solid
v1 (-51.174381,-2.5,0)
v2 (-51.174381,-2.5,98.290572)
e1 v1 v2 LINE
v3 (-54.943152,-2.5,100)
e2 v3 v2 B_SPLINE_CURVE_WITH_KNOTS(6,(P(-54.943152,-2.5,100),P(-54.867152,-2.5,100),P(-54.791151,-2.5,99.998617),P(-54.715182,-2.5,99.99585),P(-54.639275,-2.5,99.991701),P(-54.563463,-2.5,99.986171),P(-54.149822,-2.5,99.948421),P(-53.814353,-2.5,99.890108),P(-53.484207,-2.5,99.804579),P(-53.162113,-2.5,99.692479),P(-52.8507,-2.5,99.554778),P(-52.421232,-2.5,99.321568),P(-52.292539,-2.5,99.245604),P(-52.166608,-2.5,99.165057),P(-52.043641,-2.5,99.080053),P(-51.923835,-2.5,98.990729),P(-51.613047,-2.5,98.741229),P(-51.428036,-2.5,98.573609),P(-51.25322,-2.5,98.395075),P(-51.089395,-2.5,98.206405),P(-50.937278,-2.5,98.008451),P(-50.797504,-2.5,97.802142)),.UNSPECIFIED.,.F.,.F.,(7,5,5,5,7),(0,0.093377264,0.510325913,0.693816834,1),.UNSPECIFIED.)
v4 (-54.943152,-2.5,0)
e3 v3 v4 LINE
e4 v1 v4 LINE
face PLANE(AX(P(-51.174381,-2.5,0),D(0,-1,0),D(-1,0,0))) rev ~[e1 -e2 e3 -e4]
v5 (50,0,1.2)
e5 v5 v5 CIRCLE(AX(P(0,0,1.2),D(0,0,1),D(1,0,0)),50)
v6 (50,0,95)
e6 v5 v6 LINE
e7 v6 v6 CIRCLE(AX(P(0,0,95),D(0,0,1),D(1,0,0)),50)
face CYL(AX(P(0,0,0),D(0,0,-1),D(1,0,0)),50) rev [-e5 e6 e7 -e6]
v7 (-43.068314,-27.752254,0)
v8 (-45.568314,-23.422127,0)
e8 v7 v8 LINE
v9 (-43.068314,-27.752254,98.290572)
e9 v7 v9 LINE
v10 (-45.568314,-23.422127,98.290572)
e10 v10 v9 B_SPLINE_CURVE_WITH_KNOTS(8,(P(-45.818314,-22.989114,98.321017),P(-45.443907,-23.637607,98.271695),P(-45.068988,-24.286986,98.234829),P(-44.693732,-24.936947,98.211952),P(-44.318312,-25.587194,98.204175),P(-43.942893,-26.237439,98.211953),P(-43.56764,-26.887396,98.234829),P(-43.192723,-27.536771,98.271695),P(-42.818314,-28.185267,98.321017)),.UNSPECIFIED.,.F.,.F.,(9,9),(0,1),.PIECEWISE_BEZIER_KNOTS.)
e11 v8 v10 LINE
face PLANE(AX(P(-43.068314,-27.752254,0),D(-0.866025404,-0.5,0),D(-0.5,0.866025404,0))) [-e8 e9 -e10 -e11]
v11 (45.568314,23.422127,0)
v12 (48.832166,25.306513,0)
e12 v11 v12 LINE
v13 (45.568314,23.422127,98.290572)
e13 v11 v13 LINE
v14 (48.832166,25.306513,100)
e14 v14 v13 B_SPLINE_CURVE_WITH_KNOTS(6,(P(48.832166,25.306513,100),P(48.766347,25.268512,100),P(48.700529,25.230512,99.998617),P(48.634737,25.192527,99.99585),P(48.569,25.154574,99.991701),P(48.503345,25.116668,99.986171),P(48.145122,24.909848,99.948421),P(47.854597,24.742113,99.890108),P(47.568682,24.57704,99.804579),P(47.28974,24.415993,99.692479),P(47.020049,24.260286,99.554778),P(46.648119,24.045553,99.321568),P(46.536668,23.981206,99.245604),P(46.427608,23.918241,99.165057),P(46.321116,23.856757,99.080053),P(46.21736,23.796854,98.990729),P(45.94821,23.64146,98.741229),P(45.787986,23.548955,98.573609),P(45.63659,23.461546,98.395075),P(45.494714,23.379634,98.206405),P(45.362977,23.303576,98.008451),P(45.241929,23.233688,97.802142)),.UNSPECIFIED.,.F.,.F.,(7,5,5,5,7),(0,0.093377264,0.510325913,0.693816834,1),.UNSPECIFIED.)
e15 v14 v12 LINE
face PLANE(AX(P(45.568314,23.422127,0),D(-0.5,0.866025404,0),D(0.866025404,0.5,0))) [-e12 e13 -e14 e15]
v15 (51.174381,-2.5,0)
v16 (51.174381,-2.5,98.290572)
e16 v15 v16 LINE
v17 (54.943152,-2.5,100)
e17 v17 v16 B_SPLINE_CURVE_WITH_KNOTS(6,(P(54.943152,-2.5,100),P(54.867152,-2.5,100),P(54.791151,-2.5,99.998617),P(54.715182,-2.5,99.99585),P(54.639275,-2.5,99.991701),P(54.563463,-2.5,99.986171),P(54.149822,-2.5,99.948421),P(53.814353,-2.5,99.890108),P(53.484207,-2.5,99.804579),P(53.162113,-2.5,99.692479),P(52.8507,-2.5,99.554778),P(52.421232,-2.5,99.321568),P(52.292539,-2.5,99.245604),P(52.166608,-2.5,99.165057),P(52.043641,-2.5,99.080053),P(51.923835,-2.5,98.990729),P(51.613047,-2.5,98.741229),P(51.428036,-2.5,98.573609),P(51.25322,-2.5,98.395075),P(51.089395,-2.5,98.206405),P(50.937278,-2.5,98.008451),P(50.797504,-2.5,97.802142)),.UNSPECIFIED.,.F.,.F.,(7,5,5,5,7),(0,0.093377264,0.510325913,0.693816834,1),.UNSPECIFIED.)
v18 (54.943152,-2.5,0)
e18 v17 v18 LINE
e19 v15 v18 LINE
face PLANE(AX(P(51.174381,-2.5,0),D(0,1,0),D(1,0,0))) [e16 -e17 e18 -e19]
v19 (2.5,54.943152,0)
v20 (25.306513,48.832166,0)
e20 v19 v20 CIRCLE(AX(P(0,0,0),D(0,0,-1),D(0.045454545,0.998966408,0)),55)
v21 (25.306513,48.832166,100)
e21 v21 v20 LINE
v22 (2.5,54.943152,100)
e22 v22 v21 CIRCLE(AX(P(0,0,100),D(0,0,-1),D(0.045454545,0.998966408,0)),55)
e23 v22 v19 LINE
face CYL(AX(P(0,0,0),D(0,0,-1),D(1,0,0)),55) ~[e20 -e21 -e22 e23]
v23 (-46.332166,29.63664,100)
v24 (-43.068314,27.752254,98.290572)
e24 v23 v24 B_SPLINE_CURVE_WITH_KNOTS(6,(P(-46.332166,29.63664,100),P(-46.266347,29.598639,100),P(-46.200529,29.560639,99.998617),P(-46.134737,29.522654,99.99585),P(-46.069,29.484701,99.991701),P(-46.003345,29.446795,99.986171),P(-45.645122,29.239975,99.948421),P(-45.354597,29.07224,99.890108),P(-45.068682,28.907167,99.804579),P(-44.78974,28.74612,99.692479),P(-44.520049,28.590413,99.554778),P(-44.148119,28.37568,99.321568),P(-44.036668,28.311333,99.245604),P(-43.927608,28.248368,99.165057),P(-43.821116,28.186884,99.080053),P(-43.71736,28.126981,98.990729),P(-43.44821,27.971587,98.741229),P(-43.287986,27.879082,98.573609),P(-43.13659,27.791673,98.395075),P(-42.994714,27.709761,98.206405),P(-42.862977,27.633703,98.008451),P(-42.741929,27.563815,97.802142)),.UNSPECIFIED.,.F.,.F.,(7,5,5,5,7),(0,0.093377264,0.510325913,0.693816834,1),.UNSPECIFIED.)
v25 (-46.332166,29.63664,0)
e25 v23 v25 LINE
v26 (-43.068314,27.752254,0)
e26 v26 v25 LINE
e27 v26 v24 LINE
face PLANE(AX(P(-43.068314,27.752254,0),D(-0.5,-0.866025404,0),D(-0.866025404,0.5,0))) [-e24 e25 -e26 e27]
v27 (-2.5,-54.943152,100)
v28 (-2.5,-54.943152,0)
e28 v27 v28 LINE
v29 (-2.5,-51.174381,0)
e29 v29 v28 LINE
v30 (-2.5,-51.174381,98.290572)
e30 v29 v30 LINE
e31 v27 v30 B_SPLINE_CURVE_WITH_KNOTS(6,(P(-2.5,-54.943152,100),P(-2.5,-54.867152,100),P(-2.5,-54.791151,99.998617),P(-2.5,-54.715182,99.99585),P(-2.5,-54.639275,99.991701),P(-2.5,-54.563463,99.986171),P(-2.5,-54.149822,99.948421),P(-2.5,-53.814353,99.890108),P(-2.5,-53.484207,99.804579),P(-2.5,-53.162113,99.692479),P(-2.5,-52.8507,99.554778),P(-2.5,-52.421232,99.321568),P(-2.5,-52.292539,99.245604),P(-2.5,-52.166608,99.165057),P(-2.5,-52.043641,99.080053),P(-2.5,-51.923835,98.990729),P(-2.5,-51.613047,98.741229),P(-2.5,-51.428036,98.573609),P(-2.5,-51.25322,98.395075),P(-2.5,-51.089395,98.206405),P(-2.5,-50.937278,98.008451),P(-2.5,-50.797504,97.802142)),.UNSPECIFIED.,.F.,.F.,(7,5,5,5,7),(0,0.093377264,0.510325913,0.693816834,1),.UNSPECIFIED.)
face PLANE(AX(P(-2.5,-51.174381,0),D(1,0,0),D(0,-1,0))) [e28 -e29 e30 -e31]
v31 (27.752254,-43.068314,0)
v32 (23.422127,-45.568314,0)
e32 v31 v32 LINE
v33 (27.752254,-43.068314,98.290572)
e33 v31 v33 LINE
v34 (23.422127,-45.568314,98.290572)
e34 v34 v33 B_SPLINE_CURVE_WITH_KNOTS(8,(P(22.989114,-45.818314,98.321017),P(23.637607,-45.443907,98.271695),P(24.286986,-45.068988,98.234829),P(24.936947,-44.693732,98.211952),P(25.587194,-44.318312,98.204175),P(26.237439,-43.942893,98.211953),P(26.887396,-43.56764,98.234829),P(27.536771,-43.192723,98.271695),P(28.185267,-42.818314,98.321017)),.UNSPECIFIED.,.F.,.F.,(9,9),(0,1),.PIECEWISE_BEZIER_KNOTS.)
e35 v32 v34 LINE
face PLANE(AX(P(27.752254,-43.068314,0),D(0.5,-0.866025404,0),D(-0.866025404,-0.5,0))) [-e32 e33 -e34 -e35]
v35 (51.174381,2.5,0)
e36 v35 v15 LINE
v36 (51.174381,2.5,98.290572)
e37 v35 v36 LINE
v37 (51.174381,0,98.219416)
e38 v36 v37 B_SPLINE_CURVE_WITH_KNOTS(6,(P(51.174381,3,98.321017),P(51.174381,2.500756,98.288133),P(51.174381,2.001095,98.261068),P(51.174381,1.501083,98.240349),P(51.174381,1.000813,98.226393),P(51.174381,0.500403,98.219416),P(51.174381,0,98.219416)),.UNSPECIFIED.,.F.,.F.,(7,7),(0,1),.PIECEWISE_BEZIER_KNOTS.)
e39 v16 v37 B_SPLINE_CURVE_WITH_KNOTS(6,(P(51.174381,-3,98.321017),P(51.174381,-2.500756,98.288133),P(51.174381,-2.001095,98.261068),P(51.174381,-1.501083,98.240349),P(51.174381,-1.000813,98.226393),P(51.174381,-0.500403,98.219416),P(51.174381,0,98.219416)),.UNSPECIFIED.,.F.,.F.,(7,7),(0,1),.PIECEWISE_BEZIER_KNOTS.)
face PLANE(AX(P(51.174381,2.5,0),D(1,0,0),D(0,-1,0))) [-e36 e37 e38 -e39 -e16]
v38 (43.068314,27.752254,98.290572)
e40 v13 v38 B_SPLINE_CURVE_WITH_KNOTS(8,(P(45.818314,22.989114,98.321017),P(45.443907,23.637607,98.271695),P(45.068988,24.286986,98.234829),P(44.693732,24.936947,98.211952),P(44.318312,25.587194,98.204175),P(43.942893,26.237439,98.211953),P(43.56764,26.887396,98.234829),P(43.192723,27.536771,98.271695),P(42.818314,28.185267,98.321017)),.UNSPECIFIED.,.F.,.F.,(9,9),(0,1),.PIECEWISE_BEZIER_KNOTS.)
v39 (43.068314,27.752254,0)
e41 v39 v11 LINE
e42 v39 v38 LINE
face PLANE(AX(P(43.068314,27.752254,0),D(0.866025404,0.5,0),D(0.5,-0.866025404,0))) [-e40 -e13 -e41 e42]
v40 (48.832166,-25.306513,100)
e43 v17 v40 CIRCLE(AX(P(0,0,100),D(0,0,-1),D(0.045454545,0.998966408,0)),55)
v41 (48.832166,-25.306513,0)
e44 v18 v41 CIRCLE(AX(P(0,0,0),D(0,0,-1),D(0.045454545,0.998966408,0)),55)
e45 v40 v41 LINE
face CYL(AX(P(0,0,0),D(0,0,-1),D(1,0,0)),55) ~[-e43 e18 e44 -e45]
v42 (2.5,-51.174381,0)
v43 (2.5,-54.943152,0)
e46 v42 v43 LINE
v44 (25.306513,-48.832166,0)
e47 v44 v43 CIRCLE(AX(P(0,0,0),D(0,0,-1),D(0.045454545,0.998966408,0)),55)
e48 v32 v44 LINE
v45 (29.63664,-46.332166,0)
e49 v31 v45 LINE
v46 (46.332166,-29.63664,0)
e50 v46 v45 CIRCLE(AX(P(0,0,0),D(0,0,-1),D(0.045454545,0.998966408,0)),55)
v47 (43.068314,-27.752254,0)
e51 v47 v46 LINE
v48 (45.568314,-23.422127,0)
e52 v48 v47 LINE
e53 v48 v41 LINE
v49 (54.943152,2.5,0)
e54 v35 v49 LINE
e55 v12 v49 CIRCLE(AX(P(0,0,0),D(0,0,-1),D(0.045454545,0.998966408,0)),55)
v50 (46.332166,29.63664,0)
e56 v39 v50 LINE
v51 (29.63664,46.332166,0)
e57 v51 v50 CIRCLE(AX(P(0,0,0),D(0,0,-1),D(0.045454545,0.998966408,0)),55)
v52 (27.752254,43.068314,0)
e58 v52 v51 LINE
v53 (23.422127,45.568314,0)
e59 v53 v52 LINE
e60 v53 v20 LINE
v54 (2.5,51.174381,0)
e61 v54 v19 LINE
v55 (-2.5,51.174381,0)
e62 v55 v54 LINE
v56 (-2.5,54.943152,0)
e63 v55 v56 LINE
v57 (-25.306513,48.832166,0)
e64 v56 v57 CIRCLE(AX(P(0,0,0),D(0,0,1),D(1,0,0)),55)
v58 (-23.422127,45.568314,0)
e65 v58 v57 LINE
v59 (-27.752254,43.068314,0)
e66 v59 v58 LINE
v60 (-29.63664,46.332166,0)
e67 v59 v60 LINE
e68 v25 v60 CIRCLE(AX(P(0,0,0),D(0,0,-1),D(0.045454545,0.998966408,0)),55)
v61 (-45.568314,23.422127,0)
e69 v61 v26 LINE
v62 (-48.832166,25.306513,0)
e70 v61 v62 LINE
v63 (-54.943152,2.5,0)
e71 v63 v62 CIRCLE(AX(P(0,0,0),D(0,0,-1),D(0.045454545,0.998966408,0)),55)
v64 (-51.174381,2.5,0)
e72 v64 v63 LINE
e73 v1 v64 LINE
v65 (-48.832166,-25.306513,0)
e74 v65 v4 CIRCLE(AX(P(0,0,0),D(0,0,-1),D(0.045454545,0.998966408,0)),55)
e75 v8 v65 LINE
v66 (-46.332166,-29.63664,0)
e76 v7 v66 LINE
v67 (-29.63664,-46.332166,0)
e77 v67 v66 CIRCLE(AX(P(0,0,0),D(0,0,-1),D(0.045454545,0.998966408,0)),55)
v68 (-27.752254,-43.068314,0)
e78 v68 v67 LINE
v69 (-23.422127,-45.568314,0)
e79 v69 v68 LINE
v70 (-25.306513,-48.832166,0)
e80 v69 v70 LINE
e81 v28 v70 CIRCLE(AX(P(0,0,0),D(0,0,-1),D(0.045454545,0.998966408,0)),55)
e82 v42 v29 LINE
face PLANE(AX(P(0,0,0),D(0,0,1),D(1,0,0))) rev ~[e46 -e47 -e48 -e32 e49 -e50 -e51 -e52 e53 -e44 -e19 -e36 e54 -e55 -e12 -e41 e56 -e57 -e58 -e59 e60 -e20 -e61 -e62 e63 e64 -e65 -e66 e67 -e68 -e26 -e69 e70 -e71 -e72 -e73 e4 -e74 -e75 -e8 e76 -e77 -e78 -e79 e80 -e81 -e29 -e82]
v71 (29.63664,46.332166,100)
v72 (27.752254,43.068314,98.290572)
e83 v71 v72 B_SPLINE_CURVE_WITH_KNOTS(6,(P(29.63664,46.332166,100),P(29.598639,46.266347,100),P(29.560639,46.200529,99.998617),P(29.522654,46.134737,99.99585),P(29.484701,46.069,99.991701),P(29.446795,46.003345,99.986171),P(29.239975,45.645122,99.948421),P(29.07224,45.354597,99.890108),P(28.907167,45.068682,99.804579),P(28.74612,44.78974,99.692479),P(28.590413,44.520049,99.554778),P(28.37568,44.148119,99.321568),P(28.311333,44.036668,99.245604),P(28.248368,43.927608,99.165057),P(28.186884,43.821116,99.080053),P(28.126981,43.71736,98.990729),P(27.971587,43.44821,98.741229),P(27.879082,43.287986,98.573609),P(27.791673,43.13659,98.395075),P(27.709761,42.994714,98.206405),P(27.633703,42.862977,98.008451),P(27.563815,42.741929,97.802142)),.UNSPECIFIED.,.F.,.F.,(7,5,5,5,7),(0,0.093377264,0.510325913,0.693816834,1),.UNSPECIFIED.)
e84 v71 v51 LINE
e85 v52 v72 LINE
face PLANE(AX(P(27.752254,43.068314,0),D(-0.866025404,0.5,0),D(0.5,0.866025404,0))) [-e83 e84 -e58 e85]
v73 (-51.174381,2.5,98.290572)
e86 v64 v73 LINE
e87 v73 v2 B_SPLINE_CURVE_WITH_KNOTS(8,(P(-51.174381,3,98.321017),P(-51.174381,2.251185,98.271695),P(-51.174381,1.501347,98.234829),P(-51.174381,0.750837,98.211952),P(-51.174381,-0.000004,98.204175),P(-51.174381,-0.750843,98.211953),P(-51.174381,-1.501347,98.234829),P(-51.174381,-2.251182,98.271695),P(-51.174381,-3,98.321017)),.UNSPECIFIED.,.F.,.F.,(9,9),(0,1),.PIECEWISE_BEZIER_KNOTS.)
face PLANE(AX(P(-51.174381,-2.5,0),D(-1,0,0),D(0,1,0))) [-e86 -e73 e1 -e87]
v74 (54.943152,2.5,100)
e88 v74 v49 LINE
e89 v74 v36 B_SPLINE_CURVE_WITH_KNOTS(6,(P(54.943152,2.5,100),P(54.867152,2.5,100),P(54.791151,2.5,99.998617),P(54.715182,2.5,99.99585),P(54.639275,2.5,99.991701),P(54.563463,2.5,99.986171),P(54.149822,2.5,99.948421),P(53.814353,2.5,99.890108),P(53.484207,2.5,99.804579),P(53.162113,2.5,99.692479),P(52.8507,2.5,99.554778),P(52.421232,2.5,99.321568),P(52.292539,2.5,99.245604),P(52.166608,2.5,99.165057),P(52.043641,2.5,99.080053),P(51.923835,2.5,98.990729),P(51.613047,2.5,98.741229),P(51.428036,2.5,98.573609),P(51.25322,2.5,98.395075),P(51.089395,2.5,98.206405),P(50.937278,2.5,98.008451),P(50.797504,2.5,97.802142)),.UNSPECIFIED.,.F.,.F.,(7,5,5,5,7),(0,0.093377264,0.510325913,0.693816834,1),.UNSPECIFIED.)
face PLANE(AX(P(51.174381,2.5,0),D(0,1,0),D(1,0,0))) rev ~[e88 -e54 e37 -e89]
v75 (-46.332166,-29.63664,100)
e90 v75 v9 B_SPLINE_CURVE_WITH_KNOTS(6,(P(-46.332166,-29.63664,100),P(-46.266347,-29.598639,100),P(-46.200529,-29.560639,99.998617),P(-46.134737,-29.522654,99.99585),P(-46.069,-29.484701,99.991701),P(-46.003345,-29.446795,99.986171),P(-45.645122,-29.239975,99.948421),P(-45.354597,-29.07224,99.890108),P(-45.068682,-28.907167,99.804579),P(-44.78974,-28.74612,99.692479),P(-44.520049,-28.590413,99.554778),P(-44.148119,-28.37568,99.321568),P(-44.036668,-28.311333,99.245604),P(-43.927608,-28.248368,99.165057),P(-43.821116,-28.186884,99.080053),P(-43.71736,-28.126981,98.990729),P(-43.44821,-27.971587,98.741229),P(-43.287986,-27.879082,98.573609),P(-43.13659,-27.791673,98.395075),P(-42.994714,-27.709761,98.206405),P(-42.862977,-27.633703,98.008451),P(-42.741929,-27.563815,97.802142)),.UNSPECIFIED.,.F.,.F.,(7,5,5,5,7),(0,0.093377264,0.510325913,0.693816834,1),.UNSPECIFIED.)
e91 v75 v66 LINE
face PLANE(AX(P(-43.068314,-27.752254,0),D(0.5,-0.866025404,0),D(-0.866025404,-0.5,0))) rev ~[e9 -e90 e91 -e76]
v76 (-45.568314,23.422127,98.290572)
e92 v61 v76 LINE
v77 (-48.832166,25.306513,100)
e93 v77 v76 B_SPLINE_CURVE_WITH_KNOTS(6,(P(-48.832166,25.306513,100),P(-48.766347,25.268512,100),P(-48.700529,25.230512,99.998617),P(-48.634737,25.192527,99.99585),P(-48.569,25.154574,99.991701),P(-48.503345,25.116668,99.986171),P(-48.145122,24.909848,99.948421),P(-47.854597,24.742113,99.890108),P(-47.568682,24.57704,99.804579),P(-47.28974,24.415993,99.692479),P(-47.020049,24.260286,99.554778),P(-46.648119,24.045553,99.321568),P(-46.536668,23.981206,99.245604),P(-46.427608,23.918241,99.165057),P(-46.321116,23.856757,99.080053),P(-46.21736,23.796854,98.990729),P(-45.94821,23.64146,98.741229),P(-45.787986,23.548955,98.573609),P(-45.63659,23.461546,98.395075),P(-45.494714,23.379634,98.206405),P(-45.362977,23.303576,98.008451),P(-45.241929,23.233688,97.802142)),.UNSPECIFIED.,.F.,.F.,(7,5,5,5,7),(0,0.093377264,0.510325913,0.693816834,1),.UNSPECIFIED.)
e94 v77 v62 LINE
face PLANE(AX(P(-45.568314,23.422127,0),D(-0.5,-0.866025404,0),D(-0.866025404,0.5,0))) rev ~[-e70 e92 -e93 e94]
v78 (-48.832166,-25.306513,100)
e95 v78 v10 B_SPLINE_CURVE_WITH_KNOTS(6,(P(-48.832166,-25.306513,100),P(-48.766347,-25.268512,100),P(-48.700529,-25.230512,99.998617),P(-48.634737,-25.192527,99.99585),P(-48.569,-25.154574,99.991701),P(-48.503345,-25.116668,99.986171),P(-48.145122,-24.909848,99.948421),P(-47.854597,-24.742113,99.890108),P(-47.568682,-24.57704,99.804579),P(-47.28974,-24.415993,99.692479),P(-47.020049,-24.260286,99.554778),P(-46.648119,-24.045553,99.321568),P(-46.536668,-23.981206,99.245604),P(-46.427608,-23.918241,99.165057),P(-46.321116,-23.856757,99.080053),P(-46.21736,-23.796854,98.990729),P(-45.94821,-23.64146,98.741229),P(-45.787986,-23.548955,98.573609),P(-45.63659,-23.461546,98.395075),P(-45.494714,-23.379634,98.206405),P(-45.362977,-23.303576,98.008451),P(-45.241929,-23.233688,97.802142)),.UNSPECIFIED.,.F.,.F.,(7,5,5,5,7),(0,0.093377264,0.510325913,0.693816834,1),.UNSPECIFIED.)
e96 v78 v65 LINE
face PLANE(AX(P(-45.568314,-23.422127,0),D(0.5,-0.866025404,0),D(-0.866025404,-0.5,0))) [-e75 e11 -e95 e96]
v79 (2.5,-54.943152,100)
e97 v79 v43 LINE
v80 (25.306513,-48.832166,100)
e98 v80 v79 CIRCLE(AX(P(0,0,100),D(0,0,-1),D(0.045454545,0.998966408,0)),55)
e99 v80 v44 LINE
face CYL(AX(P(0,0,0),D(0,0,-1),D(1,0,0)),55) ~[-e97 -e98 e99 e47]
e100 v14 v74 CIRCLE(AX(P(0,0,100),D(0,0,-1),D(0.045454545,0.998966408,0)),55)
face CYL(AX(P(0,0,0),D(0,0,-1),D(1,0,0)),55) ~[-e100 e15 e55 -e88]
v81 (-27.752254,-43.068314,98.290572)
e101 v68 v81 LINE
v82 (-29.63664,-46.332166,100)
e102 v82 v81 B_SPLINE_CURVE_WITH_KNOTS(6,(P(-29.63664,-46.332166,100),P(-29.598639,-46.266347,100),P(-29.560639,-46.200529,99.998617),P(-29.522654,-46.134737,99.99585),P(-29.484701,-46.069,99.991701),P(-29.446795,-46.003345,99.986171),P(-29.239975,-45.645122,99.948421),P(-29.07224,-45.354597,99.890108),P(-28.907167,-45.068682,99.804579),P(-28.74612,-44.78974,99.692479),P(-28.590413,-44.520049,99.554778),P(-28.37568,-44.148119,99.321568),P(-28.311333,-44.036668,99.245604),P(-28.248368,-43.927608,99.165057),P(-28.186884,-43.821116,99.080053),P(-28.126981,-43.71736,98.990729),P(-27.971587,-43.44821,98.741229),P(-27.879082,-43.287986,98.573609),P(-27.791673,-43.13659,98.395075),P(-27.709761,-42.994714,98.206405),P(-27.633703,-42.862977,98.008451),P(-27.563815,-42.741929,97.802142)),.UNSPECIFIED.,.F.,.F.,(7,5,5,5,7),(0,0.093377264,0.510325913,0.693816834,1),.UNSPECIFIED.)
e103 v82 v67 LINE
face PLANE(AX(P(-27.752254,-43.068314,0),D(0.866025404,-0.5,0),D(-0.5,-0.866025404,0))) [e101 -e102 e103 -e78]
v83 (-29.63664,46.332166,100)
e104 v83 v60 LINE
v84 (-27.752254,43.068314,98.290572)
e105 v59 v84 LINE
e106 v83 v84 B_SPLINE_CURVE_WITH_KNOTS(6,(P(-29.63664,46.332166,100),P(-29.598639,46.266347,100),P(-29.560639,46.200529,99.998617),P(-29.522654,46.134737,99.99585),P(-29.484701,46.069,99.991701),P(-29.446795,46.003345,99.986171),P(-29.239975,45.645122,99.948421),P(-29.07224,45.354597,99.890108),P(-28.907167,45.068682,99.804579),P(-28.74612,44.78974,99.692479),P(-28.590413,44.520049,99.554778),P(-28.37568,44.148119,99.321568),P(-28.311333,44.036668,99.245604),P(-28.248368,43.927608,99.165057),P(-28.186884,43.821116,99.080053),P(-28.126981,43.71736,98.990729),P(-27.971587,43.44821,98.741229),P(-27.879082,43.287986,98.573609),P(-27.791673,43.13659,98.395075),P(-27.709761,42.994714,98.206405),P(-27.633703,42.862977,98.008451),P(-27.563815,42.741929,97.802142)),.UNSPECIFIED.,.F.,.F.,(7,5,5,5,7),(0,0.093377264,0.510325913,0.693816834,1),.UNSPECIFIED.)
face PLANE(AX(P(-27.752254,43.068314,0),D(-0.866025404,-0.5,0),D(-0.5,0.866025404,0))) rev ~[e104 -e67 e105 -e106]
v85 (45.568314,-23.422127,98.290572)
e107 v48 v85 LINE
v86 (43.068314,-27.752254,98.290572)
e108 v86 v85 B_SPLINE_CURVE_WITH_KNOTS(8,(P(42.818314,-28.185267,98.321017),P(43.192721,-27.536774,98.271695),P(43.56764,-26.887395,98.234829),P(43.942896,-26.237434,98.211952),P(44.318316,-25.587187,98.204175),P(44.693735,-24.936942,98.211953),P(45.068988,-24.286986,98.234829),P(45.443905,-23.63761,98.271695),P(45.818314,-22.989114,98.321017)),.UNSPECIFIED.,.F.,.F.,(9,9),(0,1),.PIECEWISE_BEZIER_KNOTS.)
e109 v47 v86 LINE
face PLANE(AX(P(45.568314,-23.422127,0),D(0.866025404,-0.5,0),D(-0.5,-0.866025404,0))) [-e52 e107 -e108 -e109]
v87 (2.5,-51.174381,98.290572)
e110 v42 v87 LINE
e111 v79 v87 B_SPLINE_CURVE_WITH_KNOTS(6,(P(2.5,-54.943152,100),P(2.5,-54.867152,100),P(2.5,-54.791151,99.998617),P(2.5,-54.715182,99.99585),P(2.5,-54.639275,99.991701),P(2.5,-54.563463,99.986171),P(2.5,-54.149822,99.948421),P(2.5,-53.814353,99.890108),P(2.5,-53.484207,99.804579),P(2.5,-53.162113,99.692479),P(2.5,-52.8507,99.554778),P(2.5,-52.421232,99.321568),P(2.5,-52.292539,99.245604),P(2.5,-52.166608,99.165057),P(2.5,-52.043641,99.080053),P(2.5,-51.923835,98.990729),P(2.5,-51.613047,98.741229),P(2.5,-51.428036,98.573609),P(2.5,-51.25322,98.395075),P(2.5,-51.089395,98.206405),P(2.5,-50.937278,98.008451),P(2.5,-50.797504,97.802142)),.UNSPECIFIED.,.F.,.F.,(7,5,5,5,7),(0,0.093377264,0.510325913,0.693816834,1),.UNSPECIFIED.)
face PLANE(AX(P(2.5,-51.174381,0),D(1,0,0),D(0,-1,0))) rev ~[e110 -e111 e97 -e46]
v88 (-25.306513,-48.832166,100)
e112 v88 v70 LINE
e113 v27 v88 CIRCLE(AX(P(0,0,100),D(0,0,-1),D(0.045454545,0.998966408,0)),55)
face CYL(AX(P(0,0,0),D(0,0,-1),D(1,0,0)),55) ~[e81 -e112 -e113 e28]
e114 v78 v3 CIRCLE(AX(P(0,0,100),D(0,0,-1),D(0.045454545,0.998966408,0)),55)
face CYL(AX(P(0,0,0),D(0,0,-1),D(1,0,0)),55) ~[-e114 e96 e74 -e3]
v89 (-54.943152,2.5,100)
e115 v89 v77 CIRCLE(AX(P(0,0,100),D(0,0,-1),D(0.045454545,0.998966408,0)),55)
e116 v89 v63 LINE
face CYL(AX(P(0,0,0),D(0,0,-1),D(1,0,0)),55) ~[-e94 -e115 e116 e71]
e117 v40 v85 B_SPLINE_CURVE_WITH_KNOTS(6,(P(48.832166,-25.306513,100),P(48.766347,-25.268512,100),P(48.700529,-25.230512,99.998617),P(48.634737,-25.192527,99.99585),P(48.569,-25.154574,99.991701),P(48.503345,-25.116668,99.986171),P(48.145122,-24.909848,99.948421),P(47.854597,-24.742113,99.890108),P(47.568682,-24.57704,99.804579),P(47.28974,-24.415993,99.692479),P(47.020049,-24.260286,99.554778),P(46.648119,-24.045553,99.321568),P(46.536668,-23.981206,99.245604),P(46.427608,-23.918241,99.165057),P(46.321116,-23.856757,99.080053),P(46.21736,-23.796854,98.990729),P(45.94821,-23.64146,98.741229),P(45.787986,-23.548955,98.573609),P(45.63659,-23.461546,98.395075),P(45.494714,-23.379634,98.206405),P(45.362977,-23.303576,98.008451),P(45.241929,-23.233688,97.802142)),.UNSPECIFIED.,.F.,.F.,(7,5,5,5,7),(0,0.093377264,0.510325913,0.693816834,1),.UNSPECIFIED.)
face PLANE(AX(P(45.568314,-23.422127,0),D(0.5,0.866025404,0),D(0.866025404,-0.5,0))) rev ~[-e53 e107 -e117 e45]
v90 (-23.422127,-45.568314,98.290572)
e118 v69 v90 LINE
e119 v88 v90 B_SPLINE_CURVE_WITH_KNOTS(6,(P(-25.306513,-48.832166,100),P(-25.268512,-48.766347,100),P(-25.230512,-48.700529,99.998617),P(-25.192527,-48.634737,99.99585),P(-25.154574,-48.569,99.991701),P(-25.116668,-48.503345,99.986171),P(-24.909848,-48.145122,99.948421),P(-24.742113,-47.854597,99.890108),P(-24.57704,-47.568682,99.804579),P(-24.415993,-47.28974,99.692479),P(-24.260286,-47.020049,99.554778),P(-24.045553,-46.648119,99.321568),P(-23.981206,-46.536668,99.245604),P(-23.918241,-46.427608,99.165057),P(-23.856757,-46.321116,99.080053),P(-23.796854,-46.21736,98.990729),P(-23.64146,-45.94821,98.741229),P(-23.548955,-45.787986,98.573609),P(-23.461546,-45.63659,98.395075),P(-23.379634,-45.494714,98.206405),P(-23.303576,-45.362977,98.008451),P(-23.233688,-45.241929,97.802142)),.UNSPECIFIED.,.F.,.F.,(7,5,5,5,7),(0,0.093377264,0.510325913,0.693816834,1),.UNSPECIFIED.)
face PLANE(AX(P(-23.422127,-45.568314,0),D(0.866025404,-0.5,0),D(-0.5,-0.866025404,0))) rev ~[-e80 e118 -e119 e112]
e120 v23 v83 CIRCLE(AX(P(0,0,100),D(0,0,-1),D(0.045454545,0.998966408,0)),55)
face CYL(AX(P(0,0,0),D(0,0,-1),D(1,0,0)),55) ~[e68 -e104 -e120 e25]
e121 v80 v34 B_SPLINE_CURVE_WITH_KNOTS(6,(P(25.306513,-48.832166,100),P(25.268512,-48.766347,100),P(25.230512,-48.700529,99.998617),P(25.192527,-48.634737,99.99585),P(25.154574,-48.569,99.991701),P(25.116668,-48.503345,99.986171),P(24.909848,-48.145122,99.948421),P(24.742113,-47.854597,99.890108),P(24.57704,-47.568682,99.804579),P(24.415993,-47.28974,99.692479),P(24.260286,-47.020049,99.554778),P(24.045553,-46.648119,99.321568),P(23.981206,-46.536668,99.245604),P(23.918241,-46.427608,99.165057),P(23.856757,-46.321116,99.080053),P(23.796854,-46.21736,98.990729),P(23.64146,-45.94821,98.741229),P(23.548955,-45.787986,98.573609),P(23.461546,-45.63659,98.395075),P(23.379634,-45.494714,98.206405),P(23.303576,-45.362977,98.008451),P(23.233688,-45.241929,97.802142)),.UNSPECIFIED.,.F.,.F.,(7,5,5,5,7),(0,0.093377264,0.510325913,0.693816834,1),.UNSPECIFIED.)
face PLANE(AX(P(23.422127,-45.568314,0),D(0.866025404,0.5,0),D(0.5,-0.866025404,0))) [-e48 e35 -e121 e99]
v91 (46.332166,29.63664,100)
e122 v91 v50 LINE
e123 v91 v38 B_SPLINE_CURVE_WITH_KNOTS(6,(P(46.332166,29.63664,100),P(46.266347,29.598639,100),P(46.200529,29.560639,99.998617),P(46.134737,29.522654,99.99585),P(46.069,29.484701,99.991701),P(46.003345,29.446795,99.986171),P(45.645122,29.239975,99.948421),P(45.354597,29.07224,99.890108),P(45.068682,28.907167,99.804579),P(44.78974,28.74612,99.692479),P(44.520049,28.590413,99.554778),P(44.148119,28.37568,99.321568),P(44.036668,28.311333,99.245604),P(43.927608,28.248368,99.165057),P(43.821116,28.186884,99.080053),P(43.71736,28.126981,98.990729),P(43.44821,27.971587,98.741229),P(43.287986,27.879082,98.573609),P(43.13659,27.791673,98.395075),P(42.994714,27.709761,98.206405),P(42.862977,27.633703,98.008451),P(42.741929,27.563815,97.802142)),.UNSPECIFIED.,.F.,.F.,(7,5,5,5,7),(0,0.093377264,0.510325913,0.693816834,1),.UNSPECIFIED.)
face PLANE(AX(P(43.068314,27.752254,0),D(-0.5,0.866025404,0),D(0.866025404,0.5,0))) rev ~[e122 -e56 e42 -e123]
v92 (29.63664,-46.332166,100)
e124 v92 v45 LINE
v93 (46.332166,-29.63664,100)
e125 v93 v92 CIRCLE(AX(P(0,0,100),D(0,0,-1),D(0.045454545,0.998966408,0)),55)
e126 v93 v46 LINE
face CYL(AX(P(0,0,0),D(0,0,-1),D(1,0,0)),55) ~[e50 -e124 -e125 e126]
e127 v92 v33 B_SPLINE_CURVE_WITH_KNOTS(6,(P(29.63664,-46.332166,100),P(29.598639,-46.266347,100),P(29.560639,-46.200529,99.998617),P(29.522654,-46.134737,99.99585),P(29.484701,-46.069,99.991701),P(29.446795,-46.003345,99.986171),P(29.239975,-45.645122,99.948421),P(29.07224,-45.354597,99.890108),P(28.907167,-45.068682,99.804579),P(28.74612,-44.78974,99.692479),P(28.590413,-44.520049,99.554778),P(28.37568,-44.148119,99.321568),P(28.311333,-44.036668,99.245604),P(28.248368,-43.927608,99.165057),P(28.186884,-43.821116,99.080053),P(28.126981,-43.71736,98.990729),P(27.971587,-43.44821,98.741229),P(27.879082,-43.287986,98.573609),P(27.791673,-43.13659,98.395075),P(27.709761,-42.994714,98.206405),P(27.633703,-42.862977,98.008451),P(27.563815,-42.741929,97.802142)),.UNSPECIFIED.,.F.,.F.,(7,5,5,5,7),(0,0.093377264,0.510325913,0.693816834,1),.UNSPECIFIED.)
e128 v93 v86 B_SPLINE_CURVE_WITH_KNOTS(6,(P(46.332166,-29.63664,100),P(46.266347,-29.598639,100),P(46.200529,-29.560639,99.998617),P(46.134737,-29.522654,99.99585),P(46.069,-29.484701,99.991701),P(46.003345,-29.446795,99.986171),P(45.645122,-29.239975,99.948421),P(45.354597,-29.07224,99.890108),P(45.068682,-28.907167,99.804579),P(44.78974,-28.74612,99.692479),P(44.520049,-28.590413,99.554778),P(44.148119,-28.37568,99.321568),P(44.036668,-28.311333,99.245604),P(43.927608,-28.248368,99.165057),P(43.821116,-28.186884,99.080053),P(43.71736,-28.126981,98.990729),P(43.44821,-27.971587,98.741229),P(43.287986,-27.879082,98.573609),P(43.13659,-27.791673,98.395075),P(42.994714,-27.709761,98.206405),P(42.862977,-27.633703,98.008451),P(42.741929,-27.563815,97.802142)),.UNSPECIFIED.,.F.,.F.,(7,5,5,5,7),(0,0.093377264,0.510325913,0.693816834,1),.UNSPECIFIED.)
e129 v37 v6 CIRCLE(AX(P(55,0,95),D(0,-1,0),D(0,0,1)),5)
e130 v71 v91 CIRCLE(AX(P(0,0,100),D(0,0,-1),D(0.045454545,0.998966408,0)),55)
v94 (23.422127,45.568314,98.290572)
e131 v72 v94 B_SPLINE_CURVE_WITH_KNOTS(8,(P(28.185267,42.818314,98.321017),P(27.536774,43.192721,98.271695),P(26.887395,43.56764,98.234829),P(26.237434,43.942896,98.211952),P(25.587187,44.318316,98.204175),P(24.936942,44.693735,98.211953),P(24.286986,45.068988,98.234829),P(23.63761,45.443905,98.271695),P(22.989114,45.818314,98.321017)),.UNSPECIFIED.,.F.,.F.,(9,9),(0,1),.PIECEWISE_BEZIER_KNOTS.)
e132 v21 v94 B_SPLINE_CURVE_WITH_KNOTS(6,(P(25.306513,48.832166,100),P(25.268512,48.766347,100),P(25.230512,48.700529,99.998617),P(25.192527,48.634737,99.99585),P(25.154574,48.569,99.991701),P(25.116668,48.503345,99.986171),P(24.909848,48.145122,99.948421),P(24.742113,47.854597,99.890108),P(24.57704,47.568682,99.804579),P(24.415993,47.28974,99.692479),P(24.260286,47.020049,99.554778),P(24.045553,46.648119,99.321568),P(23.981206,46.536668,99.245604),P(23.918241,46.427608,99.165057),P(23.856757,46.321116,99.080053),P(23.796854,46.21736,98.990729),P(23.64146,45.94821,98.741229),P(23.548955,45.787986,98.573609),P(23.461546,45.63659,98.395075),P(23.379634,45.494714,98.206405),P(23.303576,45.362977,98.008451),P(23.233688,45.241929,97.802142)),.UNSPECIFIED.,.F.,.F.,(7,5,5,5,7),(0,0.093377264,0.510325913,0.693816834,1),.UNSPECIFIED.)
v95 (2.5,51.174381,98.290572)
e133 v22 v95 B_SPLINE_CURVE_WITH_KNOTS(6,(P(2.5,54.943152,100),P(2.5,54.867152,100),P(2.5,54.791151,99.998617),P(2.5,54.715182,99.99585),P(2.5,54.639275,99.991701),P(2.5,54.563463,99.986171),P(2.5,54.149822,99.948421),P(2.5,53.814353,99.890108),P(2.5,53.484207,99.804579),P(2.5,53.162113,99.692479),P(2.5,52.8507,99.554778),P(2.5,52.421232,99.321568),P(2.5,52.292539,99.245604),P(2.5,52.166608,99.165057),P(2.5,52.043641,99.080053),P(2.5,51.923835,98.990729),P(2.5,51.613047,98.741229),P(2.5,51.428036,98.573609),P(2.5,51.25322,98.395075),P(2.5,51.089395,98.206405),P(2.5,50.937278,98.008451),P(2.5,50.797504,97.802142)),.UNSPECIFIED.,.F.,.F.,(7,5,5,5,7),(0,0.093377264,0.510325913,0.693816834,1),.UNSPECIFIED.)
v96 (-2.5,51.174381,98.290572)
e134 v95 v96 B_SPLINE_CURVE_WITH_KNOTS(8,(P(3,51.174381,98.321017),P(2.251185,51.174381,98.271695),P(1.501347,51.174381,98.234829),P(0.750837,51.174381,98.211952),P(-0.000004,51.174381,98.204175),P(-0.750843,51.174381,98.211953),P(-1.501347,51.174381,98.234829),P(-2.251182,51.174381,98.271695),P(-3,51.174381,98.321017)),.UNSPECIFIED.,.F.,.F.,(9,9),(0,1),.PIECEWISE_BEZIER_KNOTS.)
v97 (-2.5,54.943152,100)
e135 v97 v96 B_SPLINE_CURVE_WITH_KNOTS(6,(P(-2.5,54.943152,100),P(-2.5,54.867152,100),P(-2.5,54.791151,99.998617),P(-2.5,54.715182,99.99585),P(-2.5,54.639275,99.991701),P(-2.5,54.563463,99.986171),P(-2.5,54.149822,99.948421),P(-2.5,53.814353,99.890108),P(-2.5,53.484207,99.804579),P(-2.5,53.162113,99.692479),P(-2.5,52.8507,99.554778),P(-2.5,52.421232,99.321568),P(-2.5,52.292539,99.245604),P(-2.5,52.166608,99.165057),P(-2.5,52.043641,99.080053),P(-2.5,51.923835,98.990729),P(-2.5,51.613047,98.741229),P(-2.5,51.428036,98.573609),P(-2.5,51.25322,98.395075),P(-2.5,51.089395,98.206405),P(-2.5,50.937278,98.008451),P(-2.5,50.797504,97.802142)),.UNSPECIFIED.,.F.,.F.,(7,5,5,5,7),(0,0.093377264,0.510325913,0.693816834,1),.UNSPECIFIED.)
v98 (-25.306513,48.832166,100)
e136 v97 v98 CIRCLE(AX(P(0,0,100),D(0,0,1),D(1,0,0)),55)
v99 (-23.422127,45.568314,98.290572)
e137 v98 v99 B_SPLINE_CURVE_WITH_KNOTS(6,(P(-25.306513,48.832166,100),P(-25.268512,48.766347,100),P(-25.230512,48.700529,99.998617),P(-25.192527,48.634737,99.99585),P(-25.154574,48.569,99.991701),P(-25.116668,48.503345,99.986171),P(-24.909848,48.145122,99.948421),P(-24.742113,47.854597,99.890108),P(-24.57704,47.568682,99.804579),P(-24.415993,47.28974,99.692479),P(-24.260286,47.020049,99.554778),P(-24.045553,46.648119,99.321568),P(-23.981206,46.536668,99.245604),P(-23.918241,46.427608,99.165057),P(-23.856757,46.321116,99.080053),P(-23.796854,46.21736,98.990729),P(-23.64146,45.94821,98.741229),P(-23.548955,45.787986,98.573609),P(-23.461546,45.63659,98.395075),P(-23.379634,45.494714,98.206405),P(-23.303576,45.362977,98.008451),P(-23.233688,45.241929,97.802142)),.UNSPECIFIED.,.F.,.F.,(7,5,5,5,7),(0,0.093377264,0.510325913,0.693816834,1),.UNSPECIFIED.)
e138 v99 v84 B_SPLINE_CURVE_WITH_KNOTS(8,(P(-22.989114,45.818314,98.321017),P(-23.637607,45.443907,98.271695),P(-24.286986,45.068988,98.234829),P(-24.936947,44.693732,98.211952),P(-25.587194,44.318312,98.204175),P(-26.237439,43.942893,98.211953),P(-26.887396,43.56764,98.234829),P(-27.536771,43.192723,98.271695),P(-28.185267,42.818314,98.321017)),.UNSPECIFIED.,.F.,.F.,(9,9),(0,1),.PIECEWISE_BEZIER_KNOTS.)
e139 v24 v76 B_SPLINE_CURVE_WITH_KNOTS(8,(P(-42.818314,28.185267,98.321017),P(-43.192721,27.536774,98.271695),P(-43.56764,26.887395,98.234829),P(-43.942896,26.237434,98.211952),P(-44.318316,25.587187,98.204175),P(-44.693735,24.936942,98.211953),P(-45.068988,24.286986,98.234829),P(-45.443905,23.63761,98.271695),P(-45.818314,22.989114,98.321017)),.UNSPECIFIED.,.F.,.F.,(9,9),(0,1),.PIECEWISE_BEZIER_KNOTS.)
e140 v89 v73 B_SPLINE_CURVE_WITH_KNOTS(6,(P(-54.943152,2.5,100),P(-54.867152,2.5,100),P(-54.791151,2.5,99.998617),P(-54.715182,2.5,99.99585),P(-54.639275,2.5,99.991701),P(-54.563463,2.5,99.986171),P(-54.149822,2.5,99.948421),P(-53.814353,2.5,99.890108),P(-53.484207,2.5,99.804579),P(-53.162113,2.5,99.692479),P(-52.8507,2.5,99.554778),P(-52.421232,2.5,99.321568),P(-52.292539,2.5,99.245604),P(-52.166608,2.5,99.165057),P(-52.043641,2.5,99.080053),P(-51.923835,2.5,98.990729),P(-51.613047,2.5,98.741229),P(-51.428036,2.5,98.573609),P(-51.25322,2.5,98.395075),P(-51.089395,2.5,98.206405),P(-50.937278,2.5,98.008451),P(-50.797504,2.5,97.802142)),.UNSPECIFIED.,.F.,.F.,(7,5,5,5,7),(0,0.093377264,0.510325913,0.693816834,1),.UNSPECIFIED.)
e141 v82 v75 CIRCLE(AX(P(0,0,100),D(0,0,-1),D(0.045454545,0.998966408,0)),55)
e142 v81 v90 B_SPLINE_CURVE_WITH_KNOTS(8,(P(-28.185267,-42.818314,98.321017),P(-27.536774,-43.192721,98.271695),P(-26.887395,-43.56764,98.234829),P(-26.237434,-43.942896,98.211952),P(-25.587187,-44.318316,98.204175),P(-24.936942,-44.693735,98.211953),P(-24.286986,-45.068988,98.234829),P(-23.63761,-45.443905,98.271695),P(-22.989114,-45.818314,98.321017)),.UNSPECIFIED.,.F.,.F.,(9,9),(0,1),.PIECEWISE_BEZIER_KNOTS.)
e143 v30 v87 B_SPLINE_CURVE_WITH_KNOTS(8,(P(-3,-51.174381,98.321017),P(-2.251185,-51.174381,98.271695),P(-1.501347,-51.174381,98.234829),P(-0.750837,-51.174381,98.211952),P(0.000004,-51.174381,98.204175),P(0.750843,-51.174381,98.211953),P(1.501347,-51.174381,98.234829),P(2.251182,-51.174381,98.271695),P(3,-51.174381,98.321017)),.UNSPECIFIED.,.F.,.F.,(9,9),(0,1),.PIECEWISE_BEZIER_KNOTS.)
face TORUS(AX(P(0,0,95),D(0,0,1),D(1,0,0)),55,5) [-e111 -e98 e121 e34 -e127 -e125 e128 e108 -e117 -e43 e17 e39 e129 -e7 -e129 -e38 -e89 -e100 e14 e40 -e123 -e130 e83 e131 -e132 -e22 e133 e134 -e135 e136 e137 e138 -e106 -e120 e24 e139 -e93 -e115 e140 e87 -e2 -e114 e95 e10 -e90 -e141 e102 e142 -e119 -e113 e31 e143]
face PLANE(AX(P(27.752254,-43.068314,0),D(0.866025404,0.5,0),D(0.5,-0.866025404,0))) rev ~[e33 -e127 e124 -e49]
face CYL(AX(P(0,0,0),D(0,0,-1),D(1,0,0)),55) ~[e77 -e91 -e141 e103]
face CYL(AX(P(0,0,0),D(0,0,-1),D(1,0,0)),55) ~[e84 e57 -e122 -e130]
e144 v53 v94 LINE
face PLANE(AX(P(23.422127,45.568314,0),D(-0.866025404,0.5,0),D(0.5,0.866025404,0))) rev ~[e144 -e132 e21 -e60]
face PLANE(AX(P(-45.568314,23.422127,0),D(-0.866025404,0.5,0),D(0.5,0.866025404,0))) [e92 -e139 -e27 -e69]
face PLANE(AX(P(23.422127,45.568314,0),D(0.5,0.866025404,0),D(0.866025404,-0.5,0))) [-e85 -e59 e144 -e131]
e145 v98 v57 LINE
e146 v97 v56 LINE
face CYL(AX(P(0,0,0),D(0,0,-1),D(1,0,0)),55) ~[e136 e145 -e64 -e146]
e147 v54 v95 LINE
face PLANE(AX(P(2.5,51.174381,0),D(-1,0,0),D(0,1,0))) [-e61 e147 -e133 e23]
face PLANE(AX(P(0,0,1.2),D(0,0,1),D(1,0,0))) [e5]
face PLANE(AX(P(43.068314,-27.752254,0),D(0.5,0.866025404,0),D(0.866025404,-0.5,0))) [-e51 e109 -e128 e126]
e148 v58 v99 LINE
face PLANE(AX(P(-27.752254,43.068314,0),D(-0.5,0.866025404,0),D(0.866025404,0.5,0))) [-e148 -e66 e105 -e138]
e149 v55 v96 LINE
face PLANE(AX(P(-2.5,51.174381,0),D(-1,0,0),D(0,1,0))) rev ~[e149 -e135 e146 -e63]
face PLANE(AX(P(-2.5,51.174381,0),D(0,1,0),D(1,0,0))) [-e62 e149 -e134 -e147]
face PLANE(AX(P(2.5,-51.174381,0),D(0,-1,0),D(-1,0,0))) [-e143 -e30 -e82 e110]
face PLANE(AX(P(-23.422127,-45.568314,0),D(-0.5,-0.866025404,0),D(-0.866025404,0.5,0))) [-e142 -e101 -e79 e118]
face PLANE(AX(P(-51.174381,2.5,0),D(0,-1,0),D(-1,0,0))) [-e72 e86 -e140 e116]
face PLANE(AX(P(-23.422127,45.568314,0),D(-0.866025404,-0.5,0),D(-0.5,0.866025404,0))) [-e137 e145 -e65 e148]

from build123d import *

# Parameters (mm, degrees)
F0_R            = 55
F0_R_2          = 50
F1_DEPTH        = 100
F2_R            = 50
F3_DEPTH        = 1.2
F4_W            = 5
F4_H            = 5
F5_DEPTH        = 200.6
F5_COPIES_COUNT = 12


# Not quite as in the source:
# - a fillet or chamfer that OpenCascade refuses, or shapes differently, is made with other operations: its cross-section is extruded or revolved along the edge and cut away or added
# - a pattern or mirror of a feature is missing from the dataset's text; its kind, count and spacing are read off the source's solid


with BuildPart() as f1:
    # F0 (on Top) → F1 (new body)
    with BuildSketch(Plane.XY):
        Circle(F0_R)
        Circle(F0_R_2, mode=Mode.SUBTRACT)
    extrude(amount=F1_DEPTH)

    # F2 (on Top) → F3 (join)
    with BuildSketch(Plane.XY):
        Circle(F2_R)
    extrude(amount=F3_DEPTH)

    # F4 (on Top) → F5 (cut)
    with BuildSketch(Plane.XY):
        with Locations((0, 53.6743810624)):
            Rectangle(F4_W, F4_H)
    f5 = extrude(amount=F5_DEPTH, mode=Mode.SUBTRACT)

    # F5_copies: F5 ×12 about axis
    f5_copies_axis = Axis((0, 0, 0), (0, 0, 1))
    for i in range(1, F5_COPIES_COUNT):
        add(f5.rotate(f5_copies_axis, i * 360 / F5_COPIES_COUNT), mode=Mode.SUBTRACT)

    # F7: fillet of radius 5 on 1 edges, made by hand

    # F7_s1 → F7_t2 (revolve, cut)
    with BuildSketch(Plane.XZ):
        with BuildLine():
            ThreePointArc((55, 100), (51.4644660941, 98.5355339059), (50, 95))
            Line((50, 95), (50, 100))
            Line((50, 100), (55, 100))
        make_face()
    revolve(axis=Axis((0, 0, 100), (0, 0, 1)), mode=Mode.SUBTRACT)


solid = f1.part
